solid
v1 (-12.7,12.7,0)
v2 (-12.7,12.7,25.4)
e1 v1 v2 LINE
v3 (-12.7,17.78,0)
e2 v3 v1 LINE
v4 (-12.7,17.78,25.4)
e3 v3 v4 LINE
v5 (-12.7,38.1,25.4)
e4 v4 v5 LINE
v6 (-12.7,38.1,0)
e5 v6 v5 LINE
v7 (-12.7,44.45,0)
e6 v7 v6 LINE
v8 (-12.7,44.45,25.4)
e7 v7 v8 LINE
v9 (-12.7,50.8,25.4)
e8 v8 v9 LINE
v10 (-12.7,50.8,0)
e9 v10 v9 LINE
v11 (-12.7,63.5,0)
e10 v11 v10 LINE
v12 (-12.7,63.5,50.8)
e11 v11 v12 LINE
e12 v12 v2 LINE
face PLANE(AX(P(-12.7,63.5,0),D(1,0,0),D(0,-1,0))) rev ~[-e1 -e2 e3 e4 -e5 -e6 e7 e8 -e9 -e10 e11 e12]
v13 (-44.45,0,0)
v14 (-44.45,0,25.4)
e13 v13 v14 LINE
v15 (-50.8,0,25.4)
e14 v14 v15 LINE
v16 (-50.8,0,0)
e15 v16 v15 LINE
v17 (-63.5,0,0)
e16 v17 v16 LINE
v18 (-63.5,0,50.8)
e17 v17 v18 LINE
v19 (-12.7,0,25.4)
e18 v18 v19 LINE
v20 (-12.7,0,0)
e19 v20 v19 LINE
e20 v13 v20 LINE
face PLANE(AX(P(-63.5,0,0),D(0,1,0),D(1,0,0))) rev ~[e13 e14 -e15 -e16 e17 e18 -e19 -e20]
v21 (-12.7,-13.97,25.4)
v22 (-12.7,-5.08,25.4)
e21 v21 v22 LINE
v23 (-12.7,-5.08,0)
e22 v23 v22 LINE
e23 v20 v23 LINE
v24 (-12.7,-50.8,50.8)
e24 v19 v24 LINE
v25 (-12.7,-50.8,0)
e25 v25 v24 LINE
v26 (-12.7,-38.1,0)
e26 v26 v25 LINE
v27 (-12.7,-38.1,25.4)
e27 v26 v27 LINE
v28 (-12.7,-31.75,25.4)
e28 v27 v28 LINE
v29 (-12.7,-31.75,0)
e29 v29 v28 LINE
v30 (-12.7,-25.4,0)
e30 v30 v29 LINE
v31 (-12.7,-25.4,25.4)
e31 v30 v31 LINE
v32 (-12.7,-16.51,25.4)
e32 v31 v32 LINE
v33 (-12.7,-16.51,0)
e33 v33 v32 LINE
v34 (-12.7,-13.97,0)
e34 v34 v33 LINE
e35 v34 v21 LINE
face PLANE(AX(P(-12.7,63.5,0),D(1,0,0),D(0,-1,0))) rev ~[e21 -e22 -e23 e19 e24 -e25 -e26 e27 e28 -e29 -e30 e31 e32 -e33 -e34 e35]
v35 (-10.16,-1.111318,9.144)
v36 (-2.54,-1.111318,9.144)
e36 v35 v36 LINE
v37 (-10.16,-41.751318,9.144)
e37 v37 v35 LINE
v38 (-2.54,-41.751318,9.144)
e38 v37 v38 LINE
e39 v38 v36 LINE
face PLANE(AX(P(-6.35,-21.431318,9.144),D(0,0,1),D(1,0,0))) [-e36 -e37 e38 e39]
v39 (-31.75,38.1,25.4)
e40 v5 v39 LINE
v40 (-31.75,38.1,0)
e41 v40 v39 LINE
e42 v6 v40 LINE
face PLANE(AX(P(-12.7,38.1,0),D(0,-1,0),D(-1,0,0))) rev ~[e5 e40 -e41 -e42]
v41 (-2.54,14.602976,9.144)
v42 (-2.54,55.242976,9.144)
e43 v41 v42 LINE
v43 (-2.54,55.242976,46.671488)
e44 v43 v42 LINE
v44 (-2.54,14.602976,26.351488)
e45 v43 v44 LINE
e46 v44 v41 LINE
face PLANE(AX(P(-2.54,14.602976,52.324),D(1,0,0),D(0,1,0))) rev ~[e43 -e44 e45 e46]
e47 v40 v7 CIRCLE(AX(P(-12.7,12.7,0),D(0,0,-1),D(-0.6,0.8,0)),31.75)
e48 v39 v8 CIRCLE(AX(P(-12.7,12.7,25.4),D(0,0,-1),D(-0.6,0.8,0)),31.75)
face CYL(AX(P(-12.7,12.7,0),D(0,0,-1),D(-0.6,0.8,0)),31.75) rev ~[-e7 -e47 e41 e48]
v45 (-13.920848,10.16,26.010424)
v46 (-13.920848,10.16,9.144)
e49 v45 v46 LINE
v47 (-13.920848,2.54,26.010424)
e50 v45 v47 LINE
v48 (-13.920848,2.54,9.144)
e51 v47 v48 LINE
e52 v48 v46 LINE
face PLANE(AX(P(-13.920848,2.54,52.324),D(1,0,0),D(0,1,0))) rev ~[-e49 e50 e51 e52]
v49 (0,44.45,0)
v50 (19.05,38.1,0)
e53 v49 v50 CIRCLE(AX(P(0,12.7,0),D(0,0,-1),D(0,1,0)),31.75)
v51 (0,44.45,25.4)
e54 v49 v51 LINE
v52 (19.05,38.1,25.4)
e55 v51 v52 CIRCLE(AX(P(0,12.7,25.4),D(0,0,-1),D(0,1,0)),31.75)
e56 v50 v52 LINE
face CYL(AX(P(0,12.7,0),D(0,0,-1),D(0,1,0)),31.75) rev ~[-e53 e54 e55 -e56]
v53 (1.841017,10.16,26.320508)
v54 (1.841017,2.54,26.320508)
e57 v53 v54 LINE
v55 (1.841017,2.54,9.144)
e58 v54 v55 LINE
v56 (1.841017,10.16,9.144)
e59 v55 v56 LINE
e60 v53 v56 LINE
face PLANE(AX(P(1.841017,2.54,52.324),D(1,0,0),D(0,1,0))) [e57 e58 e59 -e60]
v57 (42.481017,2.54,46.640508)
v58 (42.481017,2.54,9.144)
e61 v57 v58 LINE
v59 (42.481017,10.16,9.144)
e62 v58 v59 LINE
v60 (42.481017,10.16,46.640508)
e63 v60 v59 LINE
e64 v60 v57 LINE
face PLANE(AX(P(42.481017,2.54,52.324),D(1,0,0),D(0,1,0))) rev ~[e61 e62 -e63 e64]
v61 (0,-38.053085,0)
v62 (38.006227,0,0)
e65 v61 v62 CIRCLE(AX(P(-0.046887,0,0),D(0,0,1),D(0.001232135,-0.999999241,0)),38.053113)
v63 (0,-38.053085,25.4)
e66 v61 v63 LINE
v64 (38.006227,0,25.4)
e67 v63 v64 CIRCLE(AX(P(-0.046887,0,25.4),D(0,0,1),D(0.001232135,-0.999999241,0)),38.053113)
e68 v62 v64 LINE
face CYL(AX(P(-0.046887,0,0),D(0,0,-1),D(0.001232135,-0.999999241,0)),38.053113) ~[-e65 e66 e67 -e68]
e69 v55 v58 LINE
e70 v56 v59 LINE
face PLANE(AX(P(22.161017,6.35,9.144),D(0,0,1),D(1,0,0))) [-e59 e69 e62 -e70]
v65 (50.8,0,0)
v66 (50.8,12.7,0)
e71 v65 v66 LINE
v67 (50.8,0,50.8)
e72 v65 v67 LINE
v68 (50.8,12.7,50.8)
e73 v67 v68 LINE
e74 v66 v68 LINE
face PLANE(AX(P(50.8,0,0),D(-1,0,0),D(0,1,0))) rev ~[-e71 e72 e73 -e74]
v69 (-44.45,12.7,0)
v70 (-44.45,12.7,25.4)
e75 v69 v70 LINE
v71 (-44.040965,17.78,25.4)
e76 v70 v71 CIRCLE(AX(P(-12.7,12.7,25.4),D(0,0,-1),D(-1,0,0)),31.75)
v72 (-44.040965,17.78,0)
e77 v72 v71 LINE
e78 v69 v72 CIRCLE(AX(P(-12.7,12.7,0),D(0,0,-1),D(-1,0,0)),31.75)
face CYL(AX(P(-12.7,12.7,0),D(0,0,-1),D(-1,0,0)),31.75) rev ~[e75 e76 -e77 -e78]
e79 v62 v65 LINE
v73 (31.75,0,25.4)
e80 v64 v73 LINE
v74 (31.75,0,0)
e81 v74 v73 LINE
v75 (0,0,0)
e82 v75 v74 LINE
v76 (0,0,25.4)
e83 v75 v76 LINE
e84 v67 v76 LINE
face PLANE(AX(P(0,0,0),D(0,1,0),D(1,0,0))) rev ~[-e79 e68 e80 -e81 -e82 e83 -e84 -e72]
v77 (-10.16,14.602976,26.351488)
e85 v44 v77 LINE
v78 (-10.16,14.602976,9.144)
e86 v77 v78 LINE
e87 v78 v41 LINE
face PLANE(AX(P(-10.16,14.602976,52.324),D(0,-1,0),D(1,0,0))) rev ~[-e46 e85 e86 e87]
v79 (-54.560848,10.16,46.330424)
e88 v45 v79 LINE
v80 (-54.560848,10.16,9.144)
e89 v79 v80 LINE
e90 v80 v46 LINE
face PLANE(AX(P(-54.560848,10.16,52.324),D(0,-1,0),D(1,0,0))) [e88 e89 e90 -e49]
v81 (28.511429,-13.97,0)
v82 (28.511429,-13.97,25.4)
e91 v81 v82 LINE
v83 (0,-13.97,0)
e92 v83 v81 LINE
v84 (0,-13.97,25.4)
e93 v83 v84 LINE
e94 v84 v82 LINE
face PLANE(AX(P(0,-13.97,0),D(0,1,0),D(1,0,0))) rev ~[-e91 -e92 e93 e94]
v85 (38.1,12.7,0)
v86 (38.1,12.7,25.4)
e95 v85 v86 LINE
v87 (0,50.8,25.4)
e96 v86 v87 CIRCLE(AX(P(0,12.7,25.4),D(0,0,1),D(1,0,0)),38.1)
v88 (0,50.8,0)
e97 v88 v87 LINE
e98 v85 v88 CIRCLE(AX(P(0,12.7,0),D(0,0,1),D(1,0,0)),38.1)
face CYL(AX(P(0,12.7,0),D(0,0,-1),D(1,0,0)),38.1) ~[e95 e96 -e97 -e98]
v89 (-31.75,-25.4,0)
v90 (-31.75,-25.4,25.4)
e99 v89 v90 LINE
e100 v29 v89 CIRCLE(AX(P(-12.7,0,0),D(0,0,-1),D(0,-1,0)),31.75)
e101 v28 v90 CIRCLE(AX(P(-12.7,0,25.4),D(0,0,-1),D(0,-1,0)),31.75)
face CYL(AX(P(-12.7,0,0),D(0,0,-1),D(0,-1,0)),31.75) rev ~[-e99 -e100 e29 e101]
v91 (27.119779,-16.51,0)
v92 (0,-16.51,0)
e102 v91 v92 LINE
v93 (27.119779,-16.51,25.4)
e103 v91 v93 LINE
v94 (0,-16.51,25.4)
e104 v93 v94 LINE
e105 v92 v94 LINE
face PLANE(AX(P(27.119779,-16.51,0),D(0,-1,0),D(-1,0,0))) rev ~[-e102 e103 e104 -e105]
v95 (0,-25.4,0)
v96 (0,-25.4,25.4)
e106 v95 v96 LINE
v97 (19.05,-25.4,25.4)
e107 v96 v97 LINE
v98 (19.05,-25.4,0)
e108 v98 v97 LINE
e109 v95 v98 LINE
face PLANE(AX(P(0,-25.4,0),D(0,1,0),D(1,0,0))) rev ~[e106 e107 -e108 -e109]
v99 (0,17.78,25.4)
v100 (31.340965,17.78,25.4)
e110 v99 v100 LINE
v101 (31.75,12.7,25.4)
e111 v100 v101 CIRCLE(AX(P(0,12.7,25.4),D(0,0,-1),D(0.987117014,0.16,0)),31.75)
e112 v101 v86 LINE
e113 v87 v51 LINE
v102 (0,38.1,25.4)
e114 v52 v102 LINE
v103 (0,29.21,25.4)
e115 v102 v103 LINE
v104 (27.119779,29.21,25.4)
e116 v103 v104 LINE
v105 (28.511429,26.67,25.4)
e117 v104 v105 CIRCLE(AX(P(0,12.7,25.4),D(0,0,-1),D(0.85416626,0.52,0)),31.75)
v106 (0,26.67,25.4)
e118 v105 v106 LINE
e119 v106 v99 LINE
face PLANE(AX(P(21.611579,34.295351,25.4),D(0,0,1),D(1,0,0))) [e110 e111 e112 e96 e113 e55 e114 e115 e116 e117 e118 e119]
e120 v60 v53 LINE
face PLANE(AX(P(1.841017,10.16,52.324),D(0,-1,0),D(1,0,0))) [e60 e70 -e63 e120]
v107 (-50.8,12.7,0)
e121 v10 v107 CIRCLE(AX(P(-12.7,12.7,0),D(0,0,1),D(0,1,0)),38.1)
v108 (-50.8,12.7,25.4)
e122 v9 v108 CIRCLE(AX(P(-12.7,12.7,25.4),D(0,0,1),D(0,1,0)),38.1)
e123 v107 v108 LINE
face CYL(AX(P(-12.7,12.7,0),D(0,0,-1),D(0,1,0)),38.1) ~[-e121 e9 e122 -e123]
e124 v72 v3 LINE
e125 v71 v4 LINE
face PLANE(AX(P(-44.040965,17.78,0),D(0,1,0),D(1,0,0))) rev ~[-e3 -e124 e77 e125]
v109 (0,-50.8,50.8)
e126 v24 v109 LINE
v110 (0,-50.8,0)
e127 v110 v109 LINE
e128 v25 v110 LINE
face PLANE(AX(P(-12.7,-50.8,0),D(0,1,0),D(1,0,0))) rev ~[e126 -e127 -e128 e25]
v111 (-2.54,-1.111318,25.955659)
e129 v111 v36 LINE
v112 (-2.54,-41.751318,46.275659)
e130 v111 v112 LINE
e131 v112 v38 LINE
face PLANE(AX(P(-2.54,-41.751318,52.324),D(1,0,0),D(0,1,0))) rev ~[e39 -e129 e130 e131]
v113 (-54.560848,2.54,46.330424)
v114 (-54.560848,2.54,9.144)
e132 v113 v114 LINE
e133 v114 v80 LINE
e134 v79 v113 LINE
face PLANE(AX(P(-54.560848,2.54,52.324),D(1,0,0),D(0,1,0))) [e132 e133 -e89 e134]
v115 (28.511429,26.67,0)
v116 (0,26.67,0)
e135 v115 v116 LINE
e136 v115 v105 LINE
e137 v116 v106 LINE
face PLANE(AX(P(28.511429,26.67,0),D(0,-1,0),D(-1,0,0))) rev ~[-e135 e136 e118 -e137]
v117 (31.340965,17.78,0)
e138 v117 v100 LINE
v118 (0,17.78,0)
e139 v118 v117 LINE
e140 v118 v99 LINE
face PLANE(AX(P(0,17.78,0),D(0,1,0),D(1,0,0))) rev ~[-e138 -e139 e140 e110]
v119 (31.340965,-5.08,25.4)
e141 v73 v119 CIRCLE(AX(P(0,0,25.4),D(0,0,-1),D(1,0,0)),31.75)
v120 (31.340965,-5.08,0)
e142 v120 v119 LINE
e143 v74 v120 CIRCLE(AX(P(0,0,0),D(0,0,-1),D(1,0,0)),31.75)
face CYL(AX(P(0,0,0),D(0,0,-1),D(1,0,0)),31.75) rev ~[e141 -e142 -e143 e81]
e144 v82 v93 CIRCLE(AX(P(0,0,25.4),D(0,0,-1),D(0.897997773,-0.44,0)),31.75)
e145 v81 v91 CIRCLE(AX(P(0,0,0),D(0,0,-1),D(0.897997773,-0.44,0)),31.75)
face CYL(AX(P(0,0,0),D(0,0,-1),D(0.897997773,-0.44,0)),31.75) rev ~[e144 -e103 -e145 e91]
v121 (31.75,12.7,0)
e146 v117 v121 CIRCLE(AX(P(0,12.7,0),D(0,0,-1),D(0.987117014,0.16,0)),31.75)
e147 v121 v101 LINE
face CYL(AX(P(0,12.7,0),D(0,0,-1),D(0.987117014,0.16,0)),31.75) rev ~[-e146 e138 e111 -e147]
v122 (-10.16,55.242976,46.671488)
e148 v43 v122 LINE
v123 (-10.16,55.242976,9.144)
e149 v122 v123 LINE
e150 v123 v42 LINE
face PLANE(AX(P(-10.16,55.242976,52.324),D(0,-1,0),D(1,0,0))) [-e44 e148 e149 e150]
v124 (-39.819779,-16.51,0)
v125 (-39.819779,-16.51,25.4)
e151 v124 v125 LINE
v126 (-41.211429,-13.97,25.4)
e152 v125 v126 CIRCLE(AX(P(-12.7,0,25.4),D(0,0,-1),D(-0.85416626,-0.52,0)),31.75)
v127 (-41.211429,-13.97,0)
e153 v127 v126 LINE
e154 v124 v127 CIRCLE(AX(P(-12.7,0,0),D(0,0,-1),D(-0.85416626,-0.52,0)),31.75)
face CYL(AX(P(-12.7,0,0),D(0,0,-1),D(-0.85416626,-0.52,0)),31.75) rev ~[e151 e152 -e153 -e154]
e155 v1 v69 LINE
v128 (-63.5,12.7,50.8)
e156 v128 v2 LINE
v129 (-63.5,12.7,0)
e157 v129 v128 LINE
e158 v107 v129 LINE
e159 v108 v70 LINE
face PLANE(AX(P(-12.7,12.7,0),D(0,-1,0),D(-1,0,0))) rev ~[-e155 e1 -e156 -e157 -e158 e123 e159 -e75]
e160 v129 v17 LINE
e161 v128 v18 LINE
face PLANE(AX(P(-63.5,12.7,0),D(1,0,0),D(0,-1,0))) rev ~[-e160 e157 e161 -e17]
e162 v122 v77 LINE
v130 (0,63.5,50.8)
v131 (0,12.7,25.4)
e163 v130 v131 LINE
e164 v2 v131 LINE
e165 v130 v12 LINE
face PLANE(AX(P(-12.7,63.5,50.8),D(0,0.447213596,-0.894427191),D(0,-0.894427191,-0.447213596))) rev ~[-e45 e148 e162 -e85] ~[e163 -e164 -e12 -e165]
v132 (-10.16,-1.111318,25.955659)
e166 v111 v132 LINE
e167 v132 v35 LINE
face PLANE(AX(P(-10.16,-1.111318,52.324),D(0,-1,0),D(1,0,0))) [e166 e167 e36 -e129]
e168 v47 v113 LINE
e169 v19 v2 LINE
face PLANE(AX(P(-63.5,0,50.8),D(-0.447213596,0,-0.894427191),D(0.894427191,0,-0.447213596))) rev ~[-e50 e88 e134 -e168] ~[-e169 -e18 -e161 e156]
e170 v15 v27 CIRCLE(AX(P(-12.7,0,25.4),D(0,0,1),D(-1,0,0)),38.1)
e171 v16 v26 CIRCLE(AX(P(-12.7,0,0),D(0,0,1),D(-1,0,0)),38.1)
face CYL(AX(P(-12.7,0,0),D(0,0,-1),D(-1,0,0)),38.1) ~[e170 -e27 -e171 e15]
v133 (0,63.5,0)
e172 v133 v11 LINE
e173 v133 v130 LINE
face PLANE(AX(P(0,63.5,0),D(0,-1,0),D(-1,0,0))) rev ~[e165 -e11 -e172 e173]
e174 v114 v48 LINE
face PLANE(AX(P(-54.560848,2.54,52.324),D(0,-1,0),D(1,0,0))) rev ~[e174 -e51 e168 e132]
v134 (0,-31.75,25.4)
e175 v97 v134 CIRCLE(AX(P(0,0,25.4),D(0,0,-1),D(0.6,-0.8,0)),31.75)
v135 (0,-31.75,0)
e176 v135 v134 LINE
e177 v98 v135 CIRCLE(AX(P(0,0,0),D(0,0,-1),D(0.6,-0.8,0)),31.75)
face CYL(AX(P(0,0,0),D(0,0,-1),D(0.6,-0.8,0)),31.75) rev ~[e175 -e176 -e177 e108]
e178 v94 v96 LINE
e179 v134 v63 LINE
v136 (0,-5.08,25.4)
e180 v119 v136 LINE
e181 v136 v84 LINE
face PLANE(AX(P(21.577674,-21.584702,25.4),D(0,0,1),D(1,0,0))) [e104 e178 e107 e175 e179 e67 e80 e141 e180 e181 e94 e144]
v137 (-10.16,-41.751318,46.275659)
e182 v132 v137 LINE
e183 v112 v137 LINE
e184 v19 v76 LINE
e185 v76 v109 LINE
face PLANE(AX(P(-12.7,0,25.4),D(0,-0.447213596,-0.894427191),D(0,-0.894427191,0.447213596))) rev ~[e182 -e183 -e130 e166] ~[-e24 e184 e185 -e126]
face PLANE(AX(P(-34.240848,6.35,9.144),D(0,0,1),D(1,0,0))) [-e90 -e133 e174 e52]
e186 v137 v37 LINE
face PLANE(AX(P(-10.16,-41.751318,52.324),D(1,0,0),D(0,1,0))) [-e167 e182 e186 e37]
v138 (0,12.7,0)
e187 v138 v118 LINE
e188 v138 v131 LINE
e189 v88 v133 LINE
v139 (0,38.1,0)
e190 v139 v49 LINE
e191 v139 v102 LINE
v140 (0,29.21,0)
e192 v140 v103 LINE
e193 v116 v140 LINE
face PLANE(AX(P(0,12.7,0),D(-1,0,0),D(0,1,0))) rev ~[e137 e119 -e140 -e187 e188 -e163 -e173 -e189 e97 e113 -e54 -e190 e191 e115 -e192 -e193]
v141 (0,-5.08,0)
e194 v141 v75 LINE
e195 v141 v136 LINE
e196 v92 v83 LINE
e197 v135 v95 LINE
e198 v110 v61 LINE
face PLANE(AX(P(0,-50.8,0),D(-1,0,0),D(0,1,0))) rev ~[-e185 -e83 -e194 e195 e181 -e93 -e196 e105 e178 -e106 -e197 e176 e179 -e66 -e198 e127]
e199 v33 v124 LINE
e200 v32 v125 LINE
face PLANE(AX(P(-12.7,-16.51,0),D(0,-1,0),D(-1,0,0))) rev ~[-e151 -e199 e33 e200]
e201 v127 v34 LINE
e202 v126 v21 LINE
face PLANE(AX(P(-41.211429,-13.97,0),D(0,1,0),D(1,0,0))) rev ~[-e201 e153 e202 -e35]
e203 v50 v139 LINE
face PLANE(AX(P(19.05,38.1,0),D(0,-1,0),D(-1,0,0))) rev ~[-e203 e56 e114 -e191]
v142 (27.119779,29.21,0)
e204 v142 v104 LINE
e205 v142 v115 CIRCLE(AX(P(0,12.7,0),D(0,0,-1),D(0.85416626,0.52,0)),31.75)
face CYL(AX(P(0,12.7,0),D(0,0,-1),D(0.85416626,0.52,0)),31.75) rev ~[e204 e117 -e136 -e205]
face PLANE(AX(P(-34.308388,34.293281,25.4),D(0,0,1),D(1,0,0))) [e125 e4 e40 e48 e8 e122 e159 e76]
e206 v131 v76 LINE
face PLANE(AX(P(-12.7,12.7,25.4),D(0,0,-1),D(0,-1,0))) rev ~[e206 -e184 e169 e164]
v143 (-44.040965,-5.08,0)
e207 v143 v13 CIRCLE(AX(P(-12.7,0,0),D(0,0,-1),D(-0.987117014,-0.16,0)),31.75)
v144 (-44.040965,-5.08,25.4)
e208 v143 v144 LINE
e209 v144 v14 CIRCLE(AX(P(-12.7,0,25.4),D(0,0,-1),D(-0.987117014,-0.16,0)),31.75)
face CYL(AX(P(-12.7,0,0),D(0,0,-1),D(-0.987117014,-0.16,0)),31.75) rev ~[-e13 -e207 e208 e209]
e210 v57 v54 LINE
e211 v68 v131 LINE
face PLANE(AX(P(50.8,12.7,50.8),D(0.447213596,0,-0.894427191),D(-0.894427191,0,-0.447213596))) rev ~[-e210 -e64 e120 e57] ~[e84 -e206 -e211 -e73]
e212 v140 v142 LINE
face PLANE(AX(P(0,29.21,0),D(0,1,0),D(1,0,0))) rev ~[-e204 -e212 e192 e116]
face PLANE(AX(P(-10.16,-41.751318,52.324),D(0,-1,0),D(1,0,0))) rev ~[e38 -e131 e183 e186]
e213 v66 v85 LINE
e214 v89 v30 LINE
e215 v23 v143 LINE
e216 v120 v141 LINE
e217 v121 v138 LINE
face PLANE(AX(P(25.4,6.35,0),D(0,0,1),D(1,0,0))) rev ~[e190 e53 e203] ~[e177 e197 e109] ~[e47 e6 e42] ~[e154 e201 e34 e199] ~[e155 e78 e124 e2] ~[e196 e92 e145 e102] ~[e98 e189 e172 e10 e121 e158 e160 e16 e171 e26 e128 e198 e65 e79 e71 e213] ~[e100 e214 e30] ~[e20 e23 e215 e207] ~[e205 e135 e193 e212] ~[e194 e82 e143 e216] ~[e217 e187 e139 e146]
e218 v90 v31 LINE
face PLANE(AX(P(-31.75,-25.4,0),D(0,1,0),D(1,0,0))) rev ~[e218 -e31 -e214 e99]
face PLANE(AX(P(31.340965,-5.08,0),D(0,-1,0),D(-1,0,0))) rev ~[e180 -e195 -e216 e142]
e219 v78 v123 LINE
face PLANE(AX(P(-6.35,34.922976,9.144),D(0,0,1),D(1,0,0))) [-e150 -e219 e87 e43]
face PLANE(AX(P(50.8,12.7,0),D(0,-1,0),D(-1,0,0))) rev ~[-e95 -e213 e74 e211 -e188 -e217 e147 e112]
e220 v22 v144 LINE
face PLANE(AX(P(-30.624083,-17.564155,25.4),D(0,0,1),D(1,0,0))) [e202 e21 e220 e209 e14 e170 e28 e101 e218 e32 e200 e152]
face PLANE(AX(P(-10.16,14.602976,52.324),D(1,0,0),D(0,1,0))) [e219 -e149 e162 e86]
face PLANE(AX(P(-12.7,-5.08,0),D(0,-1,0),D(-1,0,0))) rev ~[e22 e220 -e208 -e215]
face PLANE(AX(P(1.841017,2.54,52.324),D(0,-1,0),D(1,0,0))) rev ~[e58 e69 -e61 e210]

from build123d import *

# Parameters (mm, degrees)
F0_W      = 12.7
F0_H      = 12.7
F1_DEPTH  = 50.8
F3_DEPTH  = 25.4
F5_DEPTH  = 25.4
F7_DEPTH  = 12.7
F9_DEPTH  = 25.4
F12_DEPTH = 25.4
F13_W     = 40.64
F13_H     = 7.62
F15_W     = 7.62
F15_H     = 40.64
F11_W     = 7.62
F11_H     = 40.64
F14_W     = 40.64
F14_H     = 7.62
F16_DEPTH = 43.18


# Not quite as in the source:
# - a feature names something its author has since deleted; it is built from what else it names


with BuildPart() as f1:
    # F0 (on Top) → F1 (new body)
    with BuildSketch(Plane.XY):
        Polygon((0, 12.7), (0, 0), (31.75, 0), (38.0062268819, 0), (50.8, 0), (50.8, 12.7), (38.1, 12.7), (31.75, 12.7), align=None)
        Polygon((0, -5.08), (0, 0), (-12.7, 0), (-12.7, -5.08), (-12.7, -13.97), (-12.7, -16.51), (-12.7, -25.4), (-12.7, -31.75), (-12.7, -38.1), (-12.7, -50.8), (0, -50.8), (0, -38.0530845557), (0, -31.75), (0, -25.4), (0, -16.51), (0, -13.97), align=None)
        Polygon((-12.7, 12.7), (0, 12.7), (0, 17.78), (0, 26.67), (0, 29.21), (0, 38.1), (0, 44.45), (0, 50.8), (0, 63.5), (-12.7, 63.5), (-12.7, 50.8), (-12.7, 44.45), (-12.7, 38.1), (-12.7, 26.67), (-12.7, 17.78), align=None)
        Polygon((-44.45, 0), (-12.7, 0), (-12.7, 12.7), (-44.45, 12.7), (-50.8, 12.7), (-63.5, 12.7), (-63.5, 0), (-50.8, 0), align=None)
        with Locations((-6.35, 6.35)):
            Rectangle(F0_W, F0_H)
    extrude(amount=F1_DEPTH)

    # F2 (on face) → F3 (cut)
    with BuildSketch(Plane.XZ):
        Polygon((-63.5, 50.8), (-12.7, 25.4), (-12.7, 50.8), align=None)
    extrude(amount=-F3_DEPTH, mode=Mode.SUBTRACT)

    # F4 (on face) → F5 (cut)
    with BuildSketch(Plane(origin=(-12.7, 0, 0), x_dir=(0, -1, 0), z_dir=(-1, 0, 0))):
        Polygon((0, 50.8), (0, 25.4), (50.8, 50.8), align=None)
    extrude(amount=-F5_DEPTH, mode=Mode.SUBTRACT)

    # F6 (on face) → F7 (cut)
    with BuildSketch(Plane(origin=(-12.7, 0, 0), x_dir=(0, -1, 0), z_dir=(-1, 0, 0))):
        Polygon((-12.7, 25.4), (0, 25.4), (0, 50.8), (-63.5, 50.8), align=None)
    extrude(amount=-F7_DEPTH, mode=Mode.SUBTRACT)

    # F8 (on face) → F9 (cut)
    with BuildSketch(Plane(origin=(0, 12.7, 0), x_dir=(-1, 0, 0), z_dir=(0, 1, 0))):
        Polygon((-50.8, 50.8), (0, 25.4), (0, 50.8), align=None)
    extrude(amount=-F9_DEPTH, mode=Mode.SUBTRACT)

    # F0 (on Top) → F12 (join)
    with BuildSketch(Plane.XY):
        with BuildLine():
            Line((38.0062268819, 0), (31.75, 0))
            ThreePointArc((31.75, 0), (31.6475760941, -2.5482204312), (31.3409652053, -5.08))
            ThreePointArc((31.3409652053, -5.08), (30.2545088643, -9.6294960085), (28.5114292872, -13.97))
            ThreePointArc((28.5114292872, -13.97), (27.8445816489, -15.2558766643), (27.1197787602, -16.51))
            ThreePointArc((27.1197787602, -16.51), (23.5089375066, -21.339924023), (19.05, -25.4))
            ThreePointArc((19.05, -25.4), (10.040231571, -30.1206947131), (0, -31.75))
            Line((0, -31.75), (0, -38.0530845557))
            ThreePointArc((0, -38.0530845557), (26.8772997991, -26.8910325481), (38.0062268819, 0))
        make_face()
        with BuildLine():
            ThreePointArc((31.3409652053, 17.78), (31.6475760941, 15.2482204312), (31.75, 12.7))
            Line((31.75, 12.7), (38.1, 12.7))
            ThreePointArc((38.1, 12.7), (26.9407683632, 39.6407683632), (0, 50.8))
            Line((0, 50.8), (0, 44.45))
            ThreePointArc((0, 44.45), (10.040231571, 42.8206947131), (19.05, 38.1))
            ThreePointArc((19.05, 38.1), (23.5089375066, 34.039924023), (27.1197787602, 29.21))
            ThreePointArc((27.1197787602, 29.21), (27.8445816489, 27.9558766643), (28.5114292872, 26.67))
            ThreePointArc((28.5114292872, 26.67), (30.2545088643, 22.3294960085), (31.3409652053, 17.78))
        make_face()
        with BuildLine():
            Line((-12.7, -13.97), (-12.7, -5.08))
            Line((-12.7, -5.08), (-44.0409652053, -5.08))
            ThreePointArc((-44.0409652053, -5.08), (-44.3475760941, -2.5482204312), (-44.45, 0))
            Line((-44.45, 0), (-50.8, 0))
            ThreePointArc((-50.8, 0), (-39.6407683632, -26.9407683632), (-12.7, -38.1))
            Line((-12.7, -38.1), (-12.7, -31.75))
            ThreePointArc((-12.7, -31.75), (-22.740231571, -30.1206947131), (-31.75, -25.4))
            ThreePointArc((-31.75, -25.4), (-36.2089375066, -21.339924023), (-39.8197787602, -16.51))
            ThreePointArc((-39.8197787602, -16.51), (-40.5445816489, -15.2558766643), (-41.2114292872, -13.97))
            Line((-41.2114292872, -13.97), (-12.7, -13.97))
        make_face()
        with BuildLine():
            Line((-50.8, 12.7), (-44.45, 12.7))
            ThreePointArc((-44.45, 12.7), (-44.3475760941, 15.2482204312), (-44.0409652053, 17.78))
            ThreePointArc((-44.0409652053, 17.78), (-42.9545088643, 22.3294960085), (-41.2114292872, 26.67))
            ThreePointArc((-41.2114292872, 26.67), (-37.1577924997, 32.9454658143), (-31.75, 38.1))
            ThreePointArc((-31.75, 38.1), (-22.740231571, 42.8206947131), (-12.7, 44.45))
            Line((-12.7, 44.45), (-12.7, 50.8))
            ThreePointArc((-12.7, 50.8), (-39.6407683632, 39.6407683632), (-50.8, 12.7))
        make_face()
        with BuildLine():
            Line((-12.7, -25.4), (-12.7, -16.51))
            Line((-12.7, -16.51), (-39.8197787602, -16.51))
            ThreePointArc((-39.8197787602, -16.51), (-36.2089375066, -21.339924023), (-31.75, -25.4))
            Line((-31.75, -25.4), (-12.7, -25.4))
        make_face()
        with BuildLine():
            Line((0, 38.1), (0, 29.21))
            Line((0, 29.21), (27.1197787602, 29.21))
            ThreePointArc((27.1197787602, 29.21), (23.5089375066, 34.039924023), (19.05, 38.1))
            Line((19.05, 38.1), (0, 38.1))
        make_face()
        with BuildLine():
            Line((0, 26.67), (0, 17.78))
            Line((0, 17.78), (31.3409652053, 17.78))
            ThreePointArc((31.3409652053, 17.78), (30.2545088643, 22.3294960085), (28.5114292872, 26.67))
            Line((28.5114292872, 26.67), (0, 26.67))
        make_face()
        with BuildLine():
            Line((-41.2114292872, 26.67), (-12.7, 26.67))
            Line((-12.7, 26.67), (-12.7, 38.1))
            Line((-12.7, 38.1), (-31.75, 38.1))
            ThreePointArc((-31.75, 38.1), (-37.1577924997, 32.9454658143), (-41.2114292872, 26.67))
        make_face()
        with BuildLine():
            Line((-44.0409652053, 17.78), (-12.7, 17.78))
            Line((-12.7, 17.78), (-12.7, 26.67))
            Line((-12.7, 26.67), (-41.2114292872, 26.67))
            ThreePointArc((-41.2114292872, 26.67), (-42.9545088643, 22.3294960085), (-44.0409652053, 17.78))
        make_face()
        with BuildLine():
            Line((31.3409652053, -5.08), (0, -5.08))
            Line((0, -5.08), (0, -13.97))
            Line((0, -13.97), (28.5114292872, -13.97))
            ThreePointArc((28.5114292872, -13.97), (30.2545088643, -9.6294960085), (31.3409652053, -5.08))
        make_face()
        with BuildLine():
            Line((27.1197787602, -16.51), (0, -16.51))
            Line((0, -16.51), (0, -25.4))
            Line((0, -25.4), (19.05, -25.4))
            ThreePointArc((19.05, -25.4), (23.5089375066, -21.339924023), (27.1197787602, -16.51))
        make_face()
    extrude(amount=F12_DEPTH)

    # F13 (on offset) + F15 (on offset) + F11 (on offset) + F14 (on offset) → F16 (cut)
    with BuildSketch(Plane.XY.offset(52.324)):
        with Locations((22.1610166958, 6.35)):
            Rectangle(F13_W, F13_H)
    with BuildSketch(Plane.XY.offset(52.324)):
        with Locations((-6.35, -21.4313176799)):
            Rectangle(F15_W, F15_H)
    with BuildSketch(Plane.XY.offset(52.324)):
        with Locations((-6.35, 34.922975541)):
            Rectangle(F11_W, F11_H)
    with BuildSketch(Plane.XY.offset(52.324)):
        with Locations((-34.2408475804, 6.35)):
            Rectangle(F14_W, F14_H)
    extrude(amount=-F16_DEPTH, mode=Mode.SUBTRACT)


solid = f1.part
